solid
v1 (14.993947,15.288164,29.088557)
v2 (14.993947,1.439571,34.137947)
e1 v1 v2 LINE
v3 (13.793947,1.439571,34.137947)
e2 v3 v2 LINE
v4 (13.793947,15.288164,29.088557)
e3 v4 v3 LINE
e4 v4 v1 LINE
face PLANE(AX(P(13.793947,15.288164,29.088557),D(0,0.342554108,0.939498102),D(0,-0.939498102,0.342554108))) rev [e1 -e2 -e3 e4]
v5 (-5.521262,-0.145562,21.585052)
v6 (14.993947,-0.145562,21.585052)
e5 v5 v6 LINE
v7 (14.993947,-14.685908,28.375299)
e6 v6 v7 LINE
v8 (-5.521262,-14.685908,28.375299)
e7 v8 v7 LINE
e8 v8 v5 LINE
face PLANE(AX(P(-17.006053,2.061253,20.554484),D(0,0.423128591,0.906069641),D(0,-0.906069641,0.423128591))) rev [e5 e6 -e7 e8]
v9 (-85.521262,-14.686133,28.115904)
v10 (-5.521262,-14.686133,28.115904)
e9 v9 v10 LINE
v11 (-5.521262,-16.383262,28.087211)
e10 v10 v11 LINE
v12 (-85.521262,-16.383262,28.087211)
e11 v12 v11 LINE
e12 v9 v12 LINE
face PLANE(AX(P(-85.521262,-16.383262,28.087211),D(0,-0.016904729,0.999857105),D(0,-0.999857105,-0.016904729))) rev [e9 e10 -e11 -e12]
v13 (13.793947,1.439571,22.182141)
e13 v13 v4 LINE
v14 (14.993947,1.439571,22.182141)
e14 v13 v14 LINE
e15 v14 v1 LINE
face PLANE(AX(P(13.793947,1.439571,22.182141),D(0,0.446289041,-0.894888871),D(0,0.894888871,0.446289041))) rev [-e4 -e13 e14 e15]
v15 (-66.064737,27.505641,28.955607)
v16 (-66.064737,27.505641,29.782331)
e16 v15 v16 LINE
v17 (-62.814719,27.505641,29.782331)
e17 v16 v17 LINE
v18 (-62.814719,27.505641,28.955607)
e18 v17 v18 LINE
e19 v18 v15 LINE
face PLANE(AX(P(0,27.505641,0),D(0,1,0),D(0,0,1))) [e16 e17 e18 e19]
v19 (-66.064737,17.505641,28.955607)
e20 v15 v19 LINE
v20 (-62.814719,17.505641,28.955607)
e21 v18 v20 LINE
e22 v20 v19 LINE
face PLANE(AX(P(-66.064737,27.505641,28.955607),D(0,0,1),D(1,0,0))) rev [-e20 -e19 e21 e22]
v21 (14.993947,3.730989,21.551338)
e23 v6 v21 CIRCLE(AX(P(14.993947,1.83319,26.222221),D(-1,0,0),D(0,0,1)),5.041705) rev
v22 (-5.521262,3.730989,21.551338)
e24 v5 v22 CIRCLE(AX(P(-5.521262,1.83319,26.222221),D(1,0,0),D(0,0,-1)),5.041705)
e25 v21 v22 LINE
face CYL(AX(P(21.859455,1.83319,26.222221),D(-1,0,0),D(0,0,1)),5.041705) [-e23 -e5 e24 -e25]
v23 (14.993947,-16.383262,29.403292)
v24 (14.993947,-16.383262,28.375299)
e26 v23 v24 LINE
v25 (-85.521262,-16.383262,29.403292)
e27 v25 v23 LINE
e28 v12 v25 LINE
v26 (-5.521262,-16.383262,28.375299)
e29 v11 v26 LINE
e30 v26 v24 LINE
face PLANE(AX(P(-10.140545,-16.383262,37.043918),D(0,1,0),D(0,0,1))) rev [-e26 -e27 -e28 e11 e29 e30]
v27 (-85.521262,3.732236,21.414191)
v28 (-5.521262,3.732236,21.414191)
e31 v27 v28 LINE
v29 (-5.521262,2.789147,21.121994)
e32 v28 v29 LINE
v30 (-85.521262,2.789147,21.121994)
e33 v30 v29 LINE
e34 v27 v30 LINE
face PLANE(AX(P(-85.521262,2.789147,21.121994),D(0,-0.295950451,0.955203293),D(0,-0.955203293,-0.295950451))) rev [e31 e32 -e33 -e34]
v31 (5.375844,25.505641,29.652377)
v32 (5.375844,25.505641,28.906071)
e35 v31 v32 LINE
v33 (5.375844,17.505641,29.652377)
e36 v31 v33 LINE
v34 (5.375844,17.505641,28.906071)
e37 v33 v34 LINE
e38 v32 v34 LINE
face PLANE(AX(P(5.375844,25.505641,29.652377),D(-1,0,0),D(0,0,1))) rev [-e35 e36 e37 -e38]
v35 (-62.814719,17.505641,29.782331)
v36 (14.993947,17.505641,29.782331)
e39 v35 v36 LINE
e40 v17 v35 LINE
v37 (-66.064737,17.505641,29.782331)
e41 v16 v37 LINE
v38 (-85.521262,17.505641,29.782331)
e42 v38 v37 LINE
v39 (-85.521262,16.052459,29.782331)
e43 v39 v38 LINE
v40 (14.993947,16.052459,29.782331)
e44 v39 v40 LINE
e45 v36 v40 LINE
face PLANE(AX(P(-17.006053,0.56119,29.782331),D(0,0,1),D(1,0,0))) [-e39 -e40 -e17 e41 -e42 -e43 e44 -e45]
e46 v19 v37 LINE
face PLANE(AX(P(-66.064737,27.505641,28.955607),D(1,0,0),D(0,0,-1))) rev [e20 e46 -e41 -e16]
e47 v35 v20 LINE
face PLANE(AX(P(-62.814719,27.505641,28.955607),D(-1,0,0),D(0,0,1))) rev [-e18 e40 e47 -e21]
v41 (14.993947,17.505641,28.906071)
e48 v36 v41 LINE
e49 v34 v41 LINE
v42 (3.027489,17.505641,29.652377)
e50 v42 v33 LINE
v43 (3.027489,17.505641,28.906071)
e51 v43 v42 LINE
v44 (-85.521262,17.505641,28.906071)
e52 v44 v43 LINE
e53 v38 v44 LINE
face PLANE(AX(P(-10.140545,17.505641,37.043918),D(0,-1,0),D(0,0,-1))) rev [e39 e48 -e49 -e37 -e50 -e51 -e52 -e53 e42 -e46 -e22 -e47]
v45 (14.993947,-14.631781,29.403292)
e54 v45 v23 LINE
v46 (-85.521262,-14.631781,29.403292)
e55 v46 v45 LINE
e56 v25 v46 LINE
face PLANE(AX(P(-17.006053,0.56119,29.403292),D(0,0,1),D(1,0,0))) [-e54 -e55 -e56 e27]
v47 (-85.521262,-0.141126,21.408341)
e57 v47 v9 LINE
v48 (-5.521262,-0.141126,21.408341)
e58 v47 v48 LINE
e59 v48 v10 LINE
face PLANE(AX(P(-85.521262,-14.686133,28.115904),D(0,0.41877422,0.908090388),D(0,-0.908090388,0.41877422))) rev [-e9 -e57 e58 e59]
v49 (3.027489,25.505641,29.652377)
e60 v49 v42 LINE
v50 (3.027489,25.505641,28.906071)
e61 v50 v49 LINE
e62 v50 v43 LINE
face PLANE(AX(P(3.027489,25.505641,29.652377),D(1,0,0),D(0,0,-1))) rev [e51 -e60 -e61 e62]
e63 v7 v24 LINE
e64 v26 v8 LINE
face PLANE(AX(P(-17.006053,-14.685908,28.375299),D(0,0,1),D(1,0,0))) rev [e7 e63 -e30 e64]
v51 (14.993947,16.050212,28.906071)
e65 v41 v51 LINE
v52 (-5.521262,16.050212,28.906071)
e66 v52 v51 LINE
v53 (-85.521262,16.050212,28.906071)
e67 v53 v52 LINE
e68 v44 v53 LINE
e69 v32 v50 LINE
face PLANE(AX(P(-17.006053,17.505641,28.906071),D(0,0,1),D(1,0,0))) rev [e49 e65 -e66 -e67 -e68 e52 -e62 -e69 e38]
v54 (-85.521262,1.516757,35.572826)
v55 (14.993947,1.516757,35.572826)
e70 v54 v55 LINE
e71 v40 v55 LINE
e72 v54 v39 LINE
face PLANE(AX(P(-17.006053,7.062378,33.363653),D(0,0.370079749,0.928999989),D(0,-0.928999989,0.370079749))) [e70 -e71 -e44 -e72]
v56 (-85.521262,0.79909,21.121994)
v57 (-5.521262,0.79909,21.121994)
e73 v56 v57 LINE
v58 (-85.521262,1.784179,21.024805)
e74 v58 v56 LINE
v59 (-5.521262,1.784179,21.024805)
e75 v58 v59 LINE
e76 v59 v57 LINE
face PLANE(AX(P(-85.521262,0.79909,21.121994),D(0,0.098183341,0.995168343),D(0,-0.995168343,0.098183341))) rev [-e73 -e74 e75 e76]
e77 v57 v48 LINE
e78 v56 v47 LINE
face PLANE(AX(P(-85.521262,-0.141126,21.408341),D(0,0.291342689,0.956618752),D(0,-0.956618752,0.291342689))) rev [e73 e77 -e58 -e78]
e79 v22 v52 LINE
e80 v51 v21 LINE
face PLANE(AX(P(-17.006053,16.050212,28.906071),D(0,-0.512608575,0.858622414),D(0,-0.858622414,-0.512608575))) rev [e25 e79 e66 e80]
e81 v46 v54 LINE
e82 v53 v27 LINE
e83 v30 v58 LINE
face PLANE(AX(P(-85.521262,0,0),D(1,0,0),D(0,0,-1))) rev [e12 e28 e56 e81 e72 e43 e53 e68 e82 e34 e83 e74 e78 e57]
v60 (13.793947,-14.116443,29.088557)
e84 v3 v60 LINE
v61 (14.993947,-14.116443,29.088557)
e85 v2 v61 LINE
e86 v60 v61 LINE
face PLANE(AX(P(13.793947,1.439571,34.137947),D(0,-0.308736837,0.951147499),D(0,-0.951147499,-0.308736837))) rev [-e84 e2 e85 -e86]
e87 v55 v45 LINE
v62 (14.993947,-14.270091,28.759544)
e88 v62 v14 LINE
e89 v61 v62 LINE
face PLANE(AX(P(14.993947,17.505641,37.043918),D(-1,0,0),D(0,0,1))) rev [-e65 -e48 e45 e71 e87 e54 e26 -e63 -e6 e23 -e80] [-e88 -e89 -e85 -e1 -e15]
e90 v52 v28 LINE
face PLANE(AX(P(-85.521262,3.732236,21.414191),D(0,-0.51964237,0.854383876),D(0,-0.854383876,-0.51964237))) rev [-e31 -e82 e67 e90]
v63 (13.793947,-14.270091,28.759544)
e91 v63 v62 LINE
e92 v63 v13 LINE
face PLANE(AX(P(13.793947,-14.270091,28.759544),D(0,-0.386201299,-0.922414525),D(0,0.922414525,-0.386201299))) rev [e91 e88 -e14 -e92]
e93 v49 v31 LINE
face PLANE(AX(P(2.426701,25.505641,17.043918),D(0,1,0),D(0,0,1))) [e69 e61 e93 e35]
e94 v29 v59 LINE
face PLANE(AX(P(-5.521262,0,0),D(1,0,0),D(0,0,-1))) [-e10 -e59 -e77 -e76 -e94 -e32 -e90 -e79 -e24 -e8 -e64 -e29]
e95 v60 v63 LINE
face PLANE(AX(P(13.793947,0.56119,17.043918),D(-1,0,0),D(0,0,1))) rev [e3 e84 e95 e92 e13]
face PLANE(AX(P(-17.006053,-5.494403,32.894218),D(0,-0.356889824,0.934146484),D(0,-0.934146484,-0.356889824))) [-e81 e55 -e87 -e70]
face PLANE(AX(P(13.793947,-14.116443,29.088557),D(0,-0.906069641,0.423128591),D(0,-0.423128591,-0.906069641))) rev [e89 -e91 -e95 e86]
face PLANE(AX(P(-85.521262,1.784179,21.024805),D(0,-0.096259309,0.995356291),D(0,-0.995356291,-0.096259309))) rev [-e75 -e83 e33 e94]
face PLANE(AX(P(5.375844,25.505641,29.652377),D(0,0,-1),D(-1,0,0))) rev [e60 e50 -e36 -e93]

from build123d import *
from build123d.topology import SkipClean

# Parameters (mm, degrees)
SKETCH4_W           = 62.83623107
SKETCH4_H           = 84.722256574
BOSS_EXTRUDE2_DEPTH = 50
CUT_EXTRUDE2_DEPTH  = 80
CUT_EXTRUDE3_DEPTH  = 80
CUT_EXTRUDE5_DEPTH  = 80
CUT_EXTRUDE6_DEPTH  = 3
CUT_EXTRUDE8_DEPTH  = 80
CUT_EXTRUDE9_DEPTH  = 80
SKETCH11_W          = 5.870888161
SKETCH11_H          = 1.865764547
BOSS_EXTRUDE3_DEPTH = 20
SCALE1_SCALE        = 0.5
SCALE2_SCALE        = 0.4
SCALE3_SCALE        = 0.5
SCALE5_SCALE        = 4
BOSS_EXTRUDE5_DEPTH = 80
SKETCH15_W          = 3.250018584
SKETCH15_H          = 0.826724594
BOSS_EXTRUDE6_DEPTH = 10


with BuildPart() as part:
    # Sketch4 → Boss-Extrude2 (new body)
    with BuildSketch(Plane.XY):
        Rectangle(SKETCH4_W, SKETCH4_H)
    extrude(amount=BOSS_EXTRUDE2_DEPTH)

    # Sketch5 → Cut-Extrude2 (cut)
    with BuildSketch(Plane(origin=(31.418115535, 0, 0), x_dir=(0, 0, -1), z_dir=(1, 0, 0))):
        Polygon((-31.846034257, 38.728174008), (-31.846034257, 42.361128287), (-50, 42.361128287), (-50, -42.361128287), (-30.898434646, -42.361128287), (-30.898434646, -37.982426726), (-46.322270236, 2.38891709), align=None)
    extrude(amount=-CUT_EXTRUDE2_DEPTH, mode=Mode.SUBTRACT)

    # Sketch6 → Cut-Extrude3 (cut)
    with BuildSketch(Plane(origin=(31.418115535, 0, 0), x_dir=(0, 0, -1), z_dir=(1, 0, 0))):
        Polygon((-29.655383969, 42.361128287), (-29.655383969, 38.722554473), (-8.776416022, 3.750158878), (-28.328453067, -38.117745), (-28.328453067, -42.361128287), (-27.677514405, -46.625913761), (16.839811583, -52.045359618), (10.267667228, 27.190343951), (3.73953172, 54.484047391), align=None)
    extrude(amount=-CUT_EXTRUDE3_DEPTH, mode=Mode.SUBTRACT)

    # Sketch7 → Cut-Extrude5 (cut)
    with BuildSketch(Plane.ZY.offset(31.418115535)):
        with BuildLine():
            ThreePointArc((13.228873585, 11.208051798), (10.417703783, 4.563945687), (11.71087014, -2.533556863))
            ThreePointArc((11.71087014, -2.533556863), (0.747619784, 5.632177302), (13.228873585, 11.208051798))
        make_face()
    extrude(amount=-CUT_EXTRUDE5_DEPTH, mode=Mode.SUBTRACT)

    # Sketch8 → Cut-Extrude6 (cut)
    with BuildSketch(Plane(origin=(31.418115535, 0, 0), x_dir=(0, 0, -1), z_dir=(1, 0, 0))):
        Polygon((-30.111598921, 36.817435747), (-42.735074125, 2.19595341), (-30.111598921, -36.694083179), (-29.289064541, -37.07820135), (-12.845557678, 2.19595341), align=None)
    extrude(amount=-CUT_EXTRUDE6_DEPTH, mode=Mode.SUBTRACT)

    # Sketch9 → Cut-Extrude8 (cut)
    with BuildSketch(Plane(origin=(0, 0, 29.655383969), x_dir=(-1, 0, 0), z_dir=(0, 0, -1))):
        Polygon((19.869908303, 42.361128287), (19.869908303, 38.722554473), (19.869908303, 5.586987563), (19.869908303, -4.186945454), (19.869908303, -38.208459621), (19.869908303, -42.059759196), (19.869908303, -47.026854784), (41.256673117, -49.585938288), (42.081255469, -21.197702537), (42.081255469, 12.428184914), (37.482224788, 37.513066745), (31.418115535, 49.4837873), align=None)
    extrude(amount=-CUT_EXTRUDE8_DEPTH, mode=Mode.SUBTRACT)

    # Sketch10 → Cut-Extrude9 (cut)
    with BuildSketch(Plane(origin=(0, -2.877407212, 4.819674209), x_dir=(-1, 0, 0), z_dir=(0, 0.5126085745439567, -0.8586224136976701))):
        Polygon((19.869908303, 48.44965729), (25.693686727, -39.803296282), (32.448126733, -43.444815965), (49.802642339, -43.444815965), (32.448126733, 57.840856492), align=None)
    extrude(amount=-CUT_EXTRUDE9_DEPTH, mode=Mode.SUBTRACT)

    # Sketch11 → Boss-Extrude3 (add)
    with BuildSketch(Plane(origin=(0, 42.361128287, 0), x_dir=(1, 0, 0), z_dir=(0, 1, 0))):
        with Locations((4.437413085, -30.588266243)):
            Rectangle(SKETCH11_W, SKETCH11_H)
    extrude(amount=BOSS_EXTRUDE3_DEPTH)


with BuildPart() as part_1:
    # Scale1: scaled about (4.044501914, 0.935318094, 28.406526913)
    add(part.part.scale(SCALE1_SCALE).moved(Location((2.022250957, 0.467659047, 14.203263457))))


with BuildPart() as part_2:
    # Scale2: scaled about (4.044501914, 0.935318094, 28.406526913)
    add(part_1.part.scale(SCALE2_SCALE).moved(Location((2.426701148, 0.561190856, 17.043916148))))


with BuildPart() as part_3:
    # Scale3: scaled about (4.044501914, 0.935318094, 28.406526913)
    add(part_2.part.scale(SCALE3_SCALE).moved(Location((2.022250957, 0.467659047, 14.203263457))))


with BuildPart() as part_4:
    # Scale5: scaled about (4.044501914, 0.935318094, 28.406526913)
    add(part_3.part.scale(SCALE5_SCALE).moved(Location((-12.133505742, -2.805954282, -85.219580739))))


with BuildPart() as boss_extrude5_tool:
    # Sketch14 → Boss-Extrude5 (new body)
    with SkipClean():  # the faces are left unmerged after this step: merging them gives an invalid solid
        with BuildSketch(Plane.ZY.offset(5.521262115)):
            Polygon((28.906071344, 17.505641119), (29.782331459, 17.505641119), (29.782331459, 16.052459408), (35.572825851, 1.51675664), (29.403291615, -14.631780886), (29.403291615, -16.38326151), (28.087210799, -16.38326151), (28.1159044, -14.686132768), (21.408340925, -0.141125859), (21.121993698, 0.799090379), (21.024804823, 1.784179002), (21.121993698, 2.789147348), (21.41419066, 3.732235959), (28.906071344, 16.050211594), align=None)
        extrude(amount=BOSS_EXTRUDE5_DEPTH)


with BuildPart() as part_5:
    with SkipClean():  # the faces are left unmerged after this step: merging them gives an invalid solid
        add(part_4.part)


with BuildPart() as part_6:
    # Boss-Extrude5: joined with boss_extrude5_tool
    with SkipClean():  # the faces are left unmerged after this step: merging them gives an invalid solid
        add(part_5.part.fuse(boss_extrude5_tool.part, tol=0.00001))

    # Sketch15 → Boss-Extrude6 (add)
    with SkipClean():  # the faces are left unmerged after this step: merging them gives an invalid solid
        with BuildSketch(Plane(origin=(0, 17.505641119, 0), x_dir=(1, 0, 0), z_dir=(0, 1, 0))):
            with Locations((-64.439728037, -29.368969162)):
                Rectangle(SKETCH15_W, SKETCH15_H)
        extrude(amount=BOSS_EXTRUDE6_DEPTH)


solid = part_6.part
